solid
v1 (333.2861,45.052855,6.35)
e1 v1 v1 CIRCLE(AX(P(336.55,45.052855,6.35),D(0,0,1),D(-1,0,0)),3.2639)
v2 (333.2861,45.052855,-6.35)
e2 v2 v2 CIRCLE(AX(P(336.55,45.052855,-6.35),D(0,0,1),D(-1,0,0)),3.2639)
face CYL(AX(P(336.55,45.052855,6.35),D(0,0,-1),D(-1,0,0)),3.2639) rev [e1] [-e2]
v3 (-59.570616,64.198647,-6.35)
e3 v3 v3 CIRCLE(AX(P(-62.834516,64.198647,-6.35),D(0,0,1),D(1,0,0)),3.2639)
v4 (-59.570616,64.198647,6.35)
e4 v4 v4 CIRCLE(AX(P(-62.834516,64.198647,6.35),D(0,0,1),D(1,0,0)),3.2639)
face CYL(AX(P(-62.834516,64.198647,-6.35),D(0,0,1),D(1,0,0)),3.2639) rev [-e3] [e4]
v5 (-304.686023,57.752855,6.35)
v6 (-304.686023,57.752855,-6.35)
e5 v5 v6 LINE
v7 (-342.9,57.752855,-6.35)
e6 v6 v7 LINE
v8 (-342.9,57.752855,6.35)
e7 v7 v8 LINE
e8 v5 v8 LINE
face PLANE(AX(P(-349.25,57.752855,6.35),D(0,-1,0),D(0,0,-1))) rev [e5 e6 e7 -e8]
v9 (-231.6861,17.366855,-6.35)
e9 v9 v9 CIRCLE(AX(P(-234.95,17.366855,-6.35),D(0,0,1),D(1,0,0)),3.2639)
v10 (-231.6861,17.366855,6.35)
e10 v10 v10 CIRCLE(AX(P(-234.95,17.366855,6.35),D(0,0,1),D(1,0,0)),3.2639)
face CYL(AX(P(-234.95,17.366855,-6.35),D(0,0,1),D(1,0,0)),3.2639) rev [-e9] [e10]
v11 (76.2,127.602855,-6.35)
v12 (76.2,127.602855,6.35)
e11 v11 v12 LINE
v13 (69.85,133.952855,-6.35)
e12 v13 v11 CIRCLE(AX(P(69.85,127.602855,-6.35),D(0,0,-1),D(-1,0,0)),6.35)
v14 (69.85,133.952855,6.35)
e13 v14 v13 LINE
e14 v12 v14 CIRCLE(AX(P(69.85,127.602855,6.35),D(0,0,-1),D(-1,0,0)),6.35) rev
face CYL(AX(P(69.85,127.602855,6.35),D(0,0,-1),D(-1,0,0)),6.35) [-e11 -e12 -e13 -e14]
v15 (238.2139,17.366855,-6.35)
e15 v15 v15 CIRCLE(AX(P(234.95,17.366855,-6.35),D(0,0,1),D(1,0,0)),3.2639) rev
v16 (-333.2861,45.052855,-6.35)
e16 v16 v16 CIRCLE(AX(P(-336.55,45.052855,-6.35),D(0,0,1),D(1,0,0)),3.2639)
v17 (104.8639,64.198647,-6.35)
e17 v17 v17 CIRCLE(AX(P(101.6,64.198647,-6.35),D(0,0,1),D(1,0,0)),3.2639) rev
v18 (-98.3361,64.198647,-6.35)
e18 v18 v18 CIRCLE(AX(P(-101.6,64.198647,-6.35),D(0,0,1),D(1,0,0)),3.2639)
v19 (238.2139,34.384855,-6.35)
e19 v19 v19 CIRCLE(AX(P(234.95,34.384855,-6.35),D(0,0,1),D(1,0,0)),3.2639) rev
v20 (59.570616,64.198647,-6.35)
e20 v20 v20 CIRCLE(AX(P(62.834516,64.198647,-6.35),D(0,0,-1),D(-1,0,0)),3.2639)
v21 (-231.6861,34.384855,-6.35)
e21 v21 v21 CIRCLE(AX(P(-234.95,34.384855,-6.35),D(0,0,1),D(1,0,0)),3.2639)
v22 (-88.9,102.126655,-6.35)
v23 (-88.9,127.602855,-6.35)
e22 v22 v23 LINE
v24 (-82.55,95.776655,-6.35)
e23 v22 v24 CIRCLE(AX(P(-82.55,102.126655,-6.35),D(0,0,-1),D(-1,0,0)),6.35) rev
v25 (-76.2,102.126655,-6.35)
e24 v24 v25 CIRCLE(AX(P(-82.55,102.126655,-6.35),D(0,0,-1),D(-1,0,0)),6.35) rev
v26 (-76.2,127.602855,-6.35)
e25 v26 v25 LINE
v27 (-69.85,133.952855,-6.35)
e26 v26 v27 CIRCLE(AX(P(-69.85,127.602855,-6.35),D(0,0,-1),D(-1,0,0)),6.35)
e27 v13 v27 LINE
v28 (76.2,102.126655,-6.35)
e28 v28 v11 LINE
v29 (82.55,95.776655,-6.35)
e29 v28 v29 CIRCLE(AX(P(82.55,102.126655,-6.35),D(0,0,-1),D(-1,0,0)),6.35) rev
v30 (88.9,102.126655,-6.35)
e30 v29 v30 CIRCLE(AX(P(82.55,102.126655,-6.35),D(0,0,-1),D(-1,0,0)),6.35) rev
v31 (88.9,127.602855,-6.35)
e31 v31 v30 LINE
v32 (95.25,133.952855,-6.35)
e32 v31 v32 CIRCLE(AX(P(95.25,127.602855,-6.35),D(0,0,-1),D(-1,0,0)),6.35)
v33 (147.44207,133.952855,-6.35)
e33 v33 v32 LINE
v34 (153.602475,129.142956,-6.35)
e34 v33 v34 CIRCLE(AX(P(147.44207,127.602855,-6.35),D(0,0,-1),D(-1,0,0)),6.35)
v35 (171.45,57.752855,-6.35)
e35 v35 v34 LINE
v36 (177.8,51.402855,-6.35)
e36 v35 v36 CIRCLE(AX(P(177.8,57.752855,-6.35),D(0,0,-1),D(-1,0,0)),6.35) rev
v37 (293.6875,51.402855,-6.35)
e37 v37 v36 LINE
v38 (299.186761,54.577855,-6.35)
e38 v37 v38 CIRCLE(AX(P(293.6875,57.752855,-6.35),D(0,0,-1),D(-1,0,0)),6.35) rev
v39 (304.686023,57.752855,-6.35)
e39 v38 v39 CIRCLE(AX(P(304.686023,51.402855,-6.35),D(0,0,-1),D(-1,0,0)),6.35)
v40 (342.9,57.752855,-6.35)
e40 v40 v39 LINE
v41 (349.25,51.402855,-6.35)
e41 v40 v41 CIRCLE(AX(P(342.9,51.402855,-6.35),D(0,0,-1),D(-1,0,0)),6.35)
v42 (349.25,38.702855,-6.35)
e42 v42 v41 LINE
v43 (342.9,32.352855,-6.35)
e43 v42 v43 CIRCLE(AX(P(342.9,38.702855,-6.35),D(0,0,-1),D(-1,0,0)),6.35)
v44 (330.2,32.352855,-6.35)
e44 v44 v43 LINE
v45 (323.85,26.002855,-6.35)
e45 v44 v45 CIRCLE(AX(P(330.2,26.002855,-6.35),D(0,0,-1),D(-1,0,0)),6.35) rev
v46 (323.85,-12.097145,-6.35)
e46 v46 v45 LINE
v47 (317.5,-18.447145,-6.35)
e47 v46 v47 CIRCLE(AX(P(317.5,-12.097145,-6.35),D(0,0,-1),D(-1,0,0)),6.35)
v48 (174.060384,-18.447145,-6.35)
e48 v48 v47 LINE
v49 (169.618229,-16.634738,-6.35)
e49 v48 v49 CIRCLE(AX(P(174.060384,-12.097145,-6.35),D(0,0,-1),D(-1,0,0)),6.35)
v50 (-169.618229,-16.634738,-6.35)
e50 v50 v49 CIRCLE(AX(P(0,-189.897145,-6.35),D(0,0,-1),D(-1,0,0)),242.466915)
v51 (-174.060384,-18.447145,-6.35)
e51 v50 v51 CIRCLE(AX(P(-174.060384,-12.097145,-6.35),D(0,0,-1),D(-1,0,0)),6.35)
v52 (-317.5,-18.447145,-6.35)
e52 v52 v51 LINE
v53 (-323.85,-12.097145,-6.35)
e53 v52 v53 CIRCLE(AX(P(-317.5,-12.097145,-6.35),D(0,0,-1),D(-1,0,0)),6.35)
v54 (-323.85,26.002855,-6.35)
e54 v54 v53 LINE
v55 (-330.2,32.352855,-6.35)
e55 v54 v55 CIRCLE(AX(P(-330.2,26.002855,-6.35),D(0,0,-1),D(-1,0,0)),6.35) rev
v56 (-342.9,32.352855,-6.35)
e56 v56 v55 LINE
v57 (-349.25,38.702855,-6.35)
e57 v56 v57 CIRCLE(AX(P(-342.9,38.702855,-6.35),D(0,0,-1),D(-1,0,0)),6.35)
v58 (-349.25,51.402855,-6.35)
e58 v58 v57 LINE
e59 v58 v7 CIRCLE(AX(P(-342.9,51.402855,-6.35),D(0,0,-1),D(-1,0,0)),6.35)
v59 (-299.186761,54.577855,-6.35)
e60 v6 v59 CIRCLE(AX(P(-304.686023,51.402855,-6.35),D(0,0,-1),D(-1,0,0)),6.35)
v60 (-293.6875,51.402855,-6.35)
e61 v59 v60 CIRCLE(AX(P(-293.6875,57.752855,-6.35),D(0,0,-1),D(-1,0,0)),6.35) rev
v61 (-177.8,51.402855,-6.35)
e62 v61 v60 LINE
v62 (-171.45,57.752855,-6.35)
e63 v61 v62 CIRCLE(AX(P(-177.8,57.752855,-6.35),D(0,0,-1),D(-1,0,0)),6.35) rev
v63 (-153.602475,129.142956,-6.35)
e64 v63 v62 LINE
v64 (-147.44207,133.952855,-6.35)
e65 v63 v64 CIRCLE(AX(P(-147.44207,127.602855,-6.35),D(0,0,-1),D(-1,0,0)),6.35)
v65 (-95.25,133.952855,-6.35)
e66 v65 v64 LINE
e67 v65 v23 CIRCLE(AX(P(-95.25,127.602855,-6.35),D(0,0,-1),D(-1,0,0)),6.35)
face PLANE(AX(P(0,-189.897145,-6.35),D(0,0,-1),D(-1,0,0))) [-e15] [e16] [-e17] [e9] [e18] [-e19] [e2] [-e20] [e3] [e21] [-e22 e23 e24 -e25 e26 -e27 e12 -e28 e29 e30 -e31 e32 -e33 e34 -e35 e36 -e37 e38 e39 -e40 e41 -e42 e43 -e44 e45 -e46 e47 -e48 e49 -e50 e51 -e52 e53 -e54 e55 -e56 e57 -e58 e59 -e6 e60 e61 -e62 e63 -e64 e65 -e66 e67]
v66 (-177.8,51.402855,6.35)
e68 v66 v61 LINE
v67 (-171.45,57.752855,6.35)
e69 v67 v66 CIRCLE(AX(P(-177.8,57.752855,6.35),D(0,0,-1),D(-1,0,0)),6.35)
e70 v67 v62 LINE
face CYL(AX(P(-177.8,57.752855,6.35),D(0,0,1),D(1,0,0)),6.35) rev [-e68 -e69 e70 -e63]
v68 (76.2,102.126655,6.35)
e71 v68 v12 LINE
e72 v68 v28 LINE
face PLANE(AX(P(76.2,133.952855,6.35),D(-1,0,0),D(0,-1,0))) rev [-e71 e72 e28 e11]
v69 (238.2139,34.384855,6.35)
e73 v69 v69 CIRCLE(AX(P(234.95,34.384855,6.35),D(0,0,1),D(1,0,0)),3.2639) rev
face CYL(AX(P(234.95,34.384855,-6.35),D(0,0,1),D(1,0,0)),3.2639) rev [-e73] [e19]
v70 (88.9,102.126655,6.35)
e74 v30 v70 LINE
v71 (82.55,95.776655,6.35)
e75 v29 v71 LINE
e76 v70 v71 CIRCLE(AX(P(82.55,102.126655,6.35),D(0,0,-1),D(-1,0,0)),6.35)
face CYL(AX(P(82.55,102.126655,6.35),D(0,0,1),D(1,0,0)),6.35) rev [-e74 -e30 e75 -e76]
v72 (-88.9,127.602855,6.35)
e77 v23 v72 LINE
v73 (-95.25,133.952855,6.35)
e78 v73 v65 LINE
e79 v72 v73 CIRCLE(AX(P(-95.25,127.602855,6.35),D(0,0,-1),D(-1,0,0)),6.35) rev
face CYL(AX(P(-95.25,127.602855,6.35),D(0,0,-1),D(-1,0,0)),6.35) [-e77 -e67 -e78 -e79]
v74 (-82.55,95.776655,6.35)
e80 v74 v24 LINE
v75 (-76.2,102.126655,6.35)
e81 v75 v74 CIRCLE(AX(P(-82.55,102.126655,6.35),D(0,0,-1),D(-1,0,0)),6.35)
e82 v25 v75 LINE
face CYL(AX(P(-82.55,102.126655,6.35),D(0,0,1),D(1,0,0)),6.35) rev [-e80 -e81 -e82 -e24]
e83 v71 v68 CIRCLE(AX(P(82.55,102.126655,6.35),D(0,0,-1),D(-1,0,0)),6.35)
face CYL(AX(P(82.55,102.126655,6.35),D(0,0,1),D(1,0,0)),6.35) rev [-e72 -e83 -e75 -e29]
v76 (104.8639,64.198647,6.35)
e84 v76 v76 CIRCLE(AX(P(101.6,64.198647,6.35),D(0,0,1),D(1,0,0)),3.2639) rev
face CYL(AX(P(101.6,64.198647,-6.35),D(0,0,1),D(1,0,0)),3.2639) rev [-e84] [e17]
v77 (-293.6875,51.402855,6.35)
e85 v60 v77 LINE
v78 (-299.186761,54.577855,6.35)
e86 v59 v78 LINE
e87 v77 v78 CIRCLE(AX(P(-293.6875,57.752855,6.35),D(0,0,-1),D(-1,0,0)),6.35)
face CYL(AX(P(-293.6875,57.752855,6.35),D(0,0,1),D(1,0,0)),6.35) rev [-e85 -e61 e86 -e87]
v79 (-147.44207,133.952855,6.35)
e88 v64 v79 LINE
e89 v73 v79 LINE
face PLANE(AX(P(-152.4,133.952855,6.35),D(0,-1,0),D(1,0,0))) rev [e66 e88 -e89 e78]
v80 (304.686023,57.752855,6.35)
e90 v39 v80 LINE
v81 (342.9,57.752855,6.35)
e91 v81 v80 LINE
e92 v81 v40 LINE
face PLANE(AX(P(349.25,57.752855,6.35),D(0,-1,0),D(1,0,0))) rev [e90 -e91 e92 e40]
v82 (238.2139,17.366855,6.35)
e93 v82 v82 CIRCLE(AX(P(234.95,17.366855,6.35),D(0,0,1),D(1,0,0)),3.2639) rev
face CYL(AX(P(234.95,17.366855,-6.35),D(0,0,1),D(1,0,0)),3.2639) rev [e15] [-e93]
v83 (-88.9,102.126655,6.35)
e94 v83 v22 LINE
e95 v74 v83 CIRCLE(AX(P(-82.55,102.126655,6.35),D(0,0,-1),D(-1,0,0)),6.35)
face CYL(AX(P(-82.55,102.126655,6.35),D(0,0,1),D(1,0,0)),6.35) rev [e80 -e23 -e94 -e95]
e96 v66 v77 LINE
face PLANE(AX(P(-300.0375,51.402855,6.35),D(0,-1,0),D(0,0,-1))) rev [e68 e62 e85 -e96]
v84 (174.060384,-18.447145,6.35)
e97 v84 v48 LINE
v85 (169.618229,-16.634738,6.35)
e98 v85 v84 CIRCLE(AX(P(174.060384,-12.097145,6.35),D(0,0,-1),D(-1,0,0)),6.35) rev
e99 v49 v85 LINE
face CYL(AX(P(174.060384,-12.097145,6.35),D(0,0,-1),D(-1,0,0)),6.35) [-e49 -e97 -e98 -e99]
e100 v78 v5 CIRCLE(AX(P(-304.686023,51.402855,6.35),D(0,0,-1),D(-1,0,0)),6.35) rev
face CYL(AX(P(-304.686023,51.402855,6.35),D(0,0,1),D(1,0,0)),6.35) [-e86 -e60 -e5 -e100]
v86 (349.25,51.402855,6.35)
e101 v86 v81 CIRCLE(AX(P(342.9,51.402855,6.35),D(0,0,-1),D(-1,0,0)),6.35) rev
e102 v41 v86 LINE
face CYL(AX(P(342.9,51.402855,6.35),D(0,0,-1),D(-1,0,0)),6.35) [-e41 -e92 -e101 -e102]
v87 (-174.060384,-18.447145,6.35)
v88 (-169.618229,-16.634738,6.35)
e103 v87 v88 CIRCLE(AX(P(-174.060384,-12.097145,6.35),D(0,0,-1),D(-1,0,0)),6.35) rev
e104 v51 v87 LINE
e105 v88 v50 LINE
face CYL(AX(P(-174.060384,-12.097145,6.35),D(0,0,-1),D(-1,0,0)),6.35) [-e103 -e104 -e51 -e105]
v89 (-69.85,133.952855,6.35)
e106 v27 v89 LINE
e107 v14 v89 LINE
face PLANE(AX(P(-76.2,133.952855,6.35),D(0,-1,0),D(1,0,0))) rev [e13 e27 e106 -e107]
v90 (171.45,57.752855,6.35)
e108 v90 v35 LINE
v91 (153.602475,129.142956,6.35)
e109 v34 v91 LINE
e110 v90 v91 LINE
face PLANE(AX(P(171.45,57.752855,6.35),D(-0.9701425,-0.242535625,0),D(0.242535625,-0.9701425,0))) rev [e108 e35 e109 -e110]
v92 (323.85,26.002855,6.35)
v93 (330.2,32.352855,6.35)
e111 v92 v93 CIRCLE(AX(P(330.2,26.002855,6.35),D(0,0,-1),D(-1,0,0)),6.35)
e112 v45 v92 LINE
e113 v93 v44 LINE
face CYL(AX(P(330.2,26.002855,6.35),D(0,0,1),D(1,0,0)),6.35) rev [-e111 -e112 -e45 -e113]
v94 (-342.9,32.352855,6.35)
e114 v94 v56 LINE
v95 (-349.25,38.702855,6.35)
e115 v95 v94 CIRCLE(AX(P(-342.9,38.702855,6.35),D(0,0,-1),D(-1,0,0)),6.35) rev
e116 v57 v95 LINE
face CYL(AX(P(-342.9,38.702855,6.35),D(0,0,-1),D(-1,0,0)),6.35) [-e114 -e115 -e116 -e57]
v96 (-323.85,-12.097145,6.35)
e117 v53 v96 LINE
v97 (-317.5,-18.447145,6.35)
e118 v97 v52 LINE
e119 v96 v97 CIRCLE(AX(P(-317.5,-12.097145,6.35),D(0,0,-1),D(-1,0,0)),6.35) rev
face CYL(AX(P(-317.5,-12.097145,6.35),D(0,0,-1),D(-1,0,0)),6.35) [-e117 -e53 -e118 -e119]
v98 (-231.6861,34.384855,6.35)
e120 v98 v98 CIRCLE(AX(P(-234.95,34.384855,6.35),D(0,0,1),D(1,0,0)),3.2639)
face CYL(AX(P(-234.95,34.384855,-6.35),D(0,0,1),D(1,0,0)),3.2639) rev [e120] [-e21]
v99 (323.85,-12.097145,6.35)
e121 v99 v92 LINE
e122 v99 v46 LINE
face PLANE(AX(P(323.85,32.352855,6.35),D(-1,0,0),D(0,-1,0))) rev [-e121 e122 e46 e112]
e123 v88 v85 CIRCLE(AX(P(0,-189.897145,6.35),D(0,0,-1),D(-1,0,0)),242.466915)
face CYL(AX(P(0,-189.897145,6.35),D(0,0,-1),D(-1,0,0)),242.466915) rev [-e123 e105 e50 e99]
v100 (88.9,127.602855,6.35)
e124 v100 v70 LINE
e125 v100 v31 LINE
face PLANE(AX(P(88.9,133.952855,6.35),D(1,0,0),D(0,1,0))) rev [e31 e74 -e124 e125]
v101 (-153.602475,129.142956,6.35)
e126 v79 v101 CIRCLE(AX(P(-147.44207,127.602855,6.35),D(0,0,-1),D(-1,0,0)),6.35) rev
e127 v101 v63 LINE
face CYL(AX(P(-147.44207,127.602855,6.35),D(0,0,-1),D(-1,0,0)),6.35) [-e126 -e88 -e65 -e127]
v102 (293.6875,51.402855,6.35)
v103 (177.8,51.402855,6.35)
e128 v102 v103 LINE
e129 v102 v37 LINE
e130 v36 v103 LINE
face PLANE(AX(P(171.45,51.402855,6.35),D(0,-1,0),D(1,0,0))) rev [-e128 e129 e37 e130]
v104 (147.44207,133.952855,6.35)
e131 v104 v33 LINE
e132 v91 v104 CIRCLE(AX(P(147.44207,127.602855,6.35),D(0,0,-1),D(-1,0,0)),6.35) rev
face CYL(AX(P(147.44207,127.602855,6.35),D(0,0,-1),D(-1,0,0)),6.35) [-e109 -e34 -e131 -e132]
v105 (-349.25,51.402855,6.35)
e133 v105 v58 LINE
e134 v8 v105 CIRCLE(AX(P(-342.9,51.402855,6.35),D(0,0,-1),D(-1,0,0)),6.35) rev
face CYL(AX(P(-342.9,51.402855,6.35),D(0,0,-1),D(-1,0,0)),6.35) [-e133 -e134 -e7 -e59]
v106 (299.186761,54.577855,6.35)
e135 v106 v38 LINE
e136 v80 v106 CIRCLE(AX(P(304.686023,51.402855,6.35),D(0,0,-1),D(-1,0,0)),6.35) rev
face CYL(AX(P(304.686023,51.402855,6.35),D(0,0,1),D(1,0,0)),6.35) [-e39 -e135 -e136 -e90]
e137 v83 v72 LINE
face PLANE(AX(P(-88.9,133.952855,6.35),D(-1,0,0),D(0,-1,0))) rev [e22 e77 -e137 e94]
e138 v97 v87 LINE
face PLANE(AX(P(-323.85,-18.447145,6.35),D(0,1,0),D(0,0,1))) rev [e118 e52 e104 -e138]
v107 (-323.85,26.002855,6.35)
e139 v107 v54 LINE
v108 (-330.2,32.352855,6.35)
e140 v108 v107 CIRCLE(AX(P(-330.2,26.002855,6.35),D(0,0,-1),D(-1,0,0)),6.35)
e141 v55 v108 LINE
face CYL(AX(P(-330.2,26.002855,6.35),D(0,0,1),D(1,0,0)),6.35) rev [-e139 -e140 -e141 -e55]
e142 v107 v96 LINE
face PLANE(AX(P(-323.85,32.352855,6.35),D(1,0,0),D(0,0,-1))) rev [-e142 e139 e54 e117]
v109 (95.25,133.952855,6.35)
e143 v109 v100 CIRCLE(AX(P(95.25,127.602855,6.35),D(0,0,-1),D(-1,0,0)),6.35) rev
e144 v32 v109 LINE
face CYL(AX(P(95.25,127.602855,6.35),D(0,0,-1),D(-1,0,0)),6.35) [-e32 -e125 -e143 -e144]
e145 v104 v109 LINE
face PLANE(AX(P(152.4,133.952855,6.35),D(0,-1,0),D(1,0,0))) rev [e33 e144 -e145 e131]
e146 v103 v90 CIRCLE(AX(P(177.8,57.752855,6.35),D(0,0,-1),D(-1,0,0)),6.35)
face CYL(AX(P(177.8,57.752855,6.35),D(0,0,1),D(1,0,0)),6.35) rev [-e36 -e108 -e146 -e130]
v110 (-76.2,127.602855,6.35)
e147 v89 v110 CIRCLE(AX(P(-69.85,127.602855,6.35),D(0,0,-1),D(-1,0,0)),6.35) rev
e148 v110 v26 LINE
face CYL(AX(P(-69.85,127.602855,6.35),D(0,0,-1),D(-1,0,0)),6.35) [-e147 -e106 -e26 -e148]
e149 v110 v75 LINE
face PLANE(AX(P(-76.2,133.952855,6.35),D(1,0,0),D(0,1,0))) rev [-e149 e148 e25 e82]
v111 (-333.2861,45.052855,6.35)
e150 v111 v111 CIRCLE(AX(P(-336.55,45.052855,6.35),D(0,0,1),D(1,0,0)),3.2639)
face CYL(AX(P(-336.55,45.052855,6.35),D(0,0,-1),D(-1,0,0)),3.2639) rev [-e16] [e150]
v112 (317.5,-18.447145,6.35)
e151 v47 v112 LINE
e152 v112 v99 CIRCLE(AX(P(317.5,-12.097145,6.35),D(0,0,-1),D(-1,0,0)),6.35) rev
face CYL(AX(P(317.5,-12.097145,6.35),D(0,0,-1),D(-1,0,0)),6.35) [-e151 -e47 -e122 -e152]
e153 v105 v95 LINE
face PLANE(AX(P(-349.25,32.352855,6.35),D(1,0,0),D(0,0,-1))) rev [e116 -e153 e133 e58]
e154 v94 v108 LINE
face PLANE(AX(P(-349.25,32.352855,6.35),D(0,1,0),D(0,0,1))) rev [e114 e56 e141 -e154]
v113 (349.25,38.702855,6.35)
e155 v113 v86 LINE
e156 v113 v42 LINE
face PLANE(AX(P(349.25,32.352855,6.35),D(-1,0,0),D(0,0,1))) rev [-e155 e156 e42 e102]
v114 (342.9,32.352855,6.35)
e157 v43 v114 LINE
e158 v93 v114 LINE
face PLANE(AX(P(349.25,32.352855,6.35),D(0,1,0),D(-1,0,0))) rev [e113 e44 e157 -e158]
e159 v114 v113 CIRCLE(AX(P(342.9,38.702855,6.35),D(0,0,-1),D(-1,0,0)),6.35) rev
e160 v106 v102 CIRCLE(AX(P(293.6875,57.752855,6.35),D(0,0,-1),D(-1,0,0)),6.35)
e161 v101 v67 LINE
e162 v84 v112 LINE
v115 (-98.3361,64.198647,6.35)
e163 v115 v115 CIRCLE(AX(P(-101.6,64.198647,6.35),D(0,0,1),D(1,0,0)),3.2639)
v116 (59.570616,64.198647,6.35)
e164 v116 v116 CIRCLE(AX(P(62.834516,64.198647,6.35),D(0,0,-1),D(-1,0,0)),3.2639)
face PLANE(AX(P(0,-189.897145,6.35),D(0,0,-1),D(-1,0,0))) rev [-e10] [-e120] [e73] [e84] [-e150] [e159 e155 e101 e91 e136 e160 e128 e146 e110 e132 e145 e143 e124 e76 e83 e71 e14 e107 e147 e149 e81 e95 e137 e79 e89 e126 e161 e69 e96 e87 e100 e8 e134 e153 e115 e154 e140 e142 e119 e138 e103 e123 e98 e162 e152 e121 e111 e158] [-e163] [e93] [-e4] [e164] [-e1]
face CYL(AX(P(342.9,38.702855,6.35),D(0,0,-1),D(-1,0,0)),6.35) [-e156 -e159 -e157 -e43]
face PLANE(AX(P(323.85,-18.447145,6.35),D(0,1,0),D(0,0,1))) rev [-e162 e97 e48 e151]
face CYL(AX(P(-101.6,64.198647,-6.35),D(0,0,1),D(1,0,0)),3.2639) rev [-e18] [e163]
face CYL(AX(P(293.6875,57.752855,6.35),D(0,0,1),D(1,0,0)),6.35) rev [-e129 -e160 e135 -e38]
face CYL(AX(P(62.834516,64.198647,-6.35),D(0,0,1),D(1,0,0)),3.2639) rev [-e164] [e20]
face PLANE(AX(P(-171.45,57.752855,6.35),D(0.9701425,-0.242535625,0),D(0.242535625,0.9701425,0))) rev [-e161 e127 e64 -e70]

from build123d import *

# Parameters (mm, degrees)
SKETCH1_R           = 3.2639
BOSS_EXTRUDE1_DEPTH = 6.35
FILLET1_R           = 6.35
SKETCH2_R           = 3.2639
CUT_EXTRUDE2_DEPTH  = 375.272921719
SKETCH3_R           = 3.2639
CUT_EXTRUDE3_DEPTH  = 375.272921719
FILLET2_R           = 6.35


with BuildPart() as part:
    # Sketch1 → Boss-Extrude1 (new, symmetric)
    with BuildSketch(Plane.XY):
        with BuildLine():
            Line((-323.85, -18.447144741), (-171.45, -18.447144741))
            ThreePointArc((-171.45, -18.447144741), (0, 52.569770528), (171.45, -18.447144741))
            Line((171.45, -18.447144741), (323.85, -18.447144741))
            Line((323.85, -18.447144741), (323.85, 32.352855259))
            Line((323.85, 32.352855259), (349.25, 32.352855259))
            Line((349.25, 32.352855259), (349.25, 57.752855259))
            Line((349.25, 57.752855259), (300.0375, 57.752855259))
            Line((300.0375, 57.752855259), (300.0375, 51.402855259))
            Line((300.0375, 51.402855259), (171.45, 51.402855259))
            Line((171.45, 51.402855259), (171.45, 57.752855259))
            Line((171.45, 57.752855259), (152.4, 133.952855259))
            Line((152.4, 133.952855259), (88.9, 133.952855259))
            Line((88.9, 133.952855259), (88.9, 95.776655259))
            Line((88.9, 95.776655259), (76.2, 95.776655259))
            Line((76.2, 95.776655259), (76.2, 133.952855259))
            Line((76.2, 133.952855259), (-76.2, 133.952855259))
            Line((-76.2, 133.952855259), (-76.2, 95.776655259))
            Line((-76.2, 95.776655259), (-88.9, 95.776655259))
            Line((-88.9, 95.776655259), (-88.9, 133.952855259))
            Line((-88.9, 133.952855259), (-152.4, 133.952855259))
            Line((-152.4, 133.952855259), (-171.45, 57.752855259))
            Line((-171.45, 57.752855259), (-171.45, 51.402855259))
            Line((-171.45, 51.402855259), (-300.0375, 51.402855259))
            Line((-300.0375, 51.402855259), (-300.0375, 57.752855259))
            Line((-300.0375, 57.752855259), (-349.25, 57.752855259))
            Line((-349.25, 57.752855259), (-349.25, 32.352855259))
            Line((-349.25, 32.352855259), (-323.85, 32.352855259))
            Line((-323.85, 32.352855259), (-323.85, -18.447144741))
        make_face()
        with Locations((-336.55, 45.052855259)):
            Circle(SKETCH1_R, mode=Mode.SUBTRACT)
        with Locations(Location((336.55, 45.052855259, 0), (0, 0, 180))):
            Circle(SKETCH1_R, mode=Mode.SUBTRACT)
    extrude(amount=BOSS_EXTRUDE1_DEPTH, both=True)

    # Fillet1
    fillet1_edges = [part.edges().sort_by_distance(p)[0] for p in [
        (88.9, 95.776655259, 0),
        (76.2, 95.776655259, 0),
        (-88.9, 95.776655259, 0),
        (-76.2, 95.776655259, 0),
        (323.85, 32.352855259, 0),
        (171.45, 51.402855259, 0),
        (300.0375, 51.402855259, 0),
        (-171.45, 51.402855259, 0),
        (-300.0375, 51.402855259, 0),
        (-323.85, 32.352855259, 0),
    ]]
    fillet(fillet1_edges, radius=FILLET1_R - 0.0001)  # a hair under: the kernel refuses the full size

    # Sketch2 → Cut-Extrude2 (cut, through all)
    with BuildSketch(Plane.XY.offset(6.35)):
        with Locations((-234.95, 17.366855259)):
            Circle(SKETCH2_R)
        with Locations((-234.95, 34.384855259)):
            Circle(SKETCH2_R)
        with Locations((234.95, 34.384855259)):
            Circle(SKETCH2_R)
        with Locations((234.95, 17.366855259)):
            Circle(SKETCH2_R)
    extrude(amount=-CUT_EXTRUDE2_DEPTH, mode=Mode.SUBTRACT)

    # Sketch3 → Cut-Extrude3 (cut, through all)
    with BuildSketch(Plane.XY.offset(6.35)):
        with Locations((-101.6, 64.198647102)):
            Circle(SKETCH3_R)
        with Locations((101.6, 64.198647102)):
            Circle(SKETCH3_R)
        with Locations((-62.834515607, 64.198647102)):
            Circle(SKETCH3_R)
        with Locations(Location((62.834515607, 64.198647102, 0), (0, 0, 180))):
            Circle(SKETCH3_R)
    extrude(amount=-CUT_EXTRUDE3_DEPTH, mode=Mode.SUBTRACT)

    # Fillet2
    fillet2_edges = [part.edges().sort_by_distance(p)[0] for p in [
        (-152.4, 133.952855259, 0),
        (-88.9, 133.952855259, 0),
        (-76.2, 133.952855259, 0),
        (76.2, 133.952855259, 0),
        (88.9, 133.952855259, 0),
        (152.4, 133.952855259, 0),
        (300.0375, 57.752855259, 0),
        (349.25, 57.752855259, 0),
        (349.25, 32.352855259, 0),
        (323.85, -18.447144741, 0),
        (171.45, -18.447144741, 0),
        (-171.45, -18.447144741, 0),
        (-323.85, -18.447144741, 0),
        (-349.25, 32.352855259, 0),
        (-349.25, 57.752855259, 0),
        (-300.0375, 57.752855259, 0),
    ]]
    fillet(fillet2_edges, radius=FILLET2_R)


solid = part.part
